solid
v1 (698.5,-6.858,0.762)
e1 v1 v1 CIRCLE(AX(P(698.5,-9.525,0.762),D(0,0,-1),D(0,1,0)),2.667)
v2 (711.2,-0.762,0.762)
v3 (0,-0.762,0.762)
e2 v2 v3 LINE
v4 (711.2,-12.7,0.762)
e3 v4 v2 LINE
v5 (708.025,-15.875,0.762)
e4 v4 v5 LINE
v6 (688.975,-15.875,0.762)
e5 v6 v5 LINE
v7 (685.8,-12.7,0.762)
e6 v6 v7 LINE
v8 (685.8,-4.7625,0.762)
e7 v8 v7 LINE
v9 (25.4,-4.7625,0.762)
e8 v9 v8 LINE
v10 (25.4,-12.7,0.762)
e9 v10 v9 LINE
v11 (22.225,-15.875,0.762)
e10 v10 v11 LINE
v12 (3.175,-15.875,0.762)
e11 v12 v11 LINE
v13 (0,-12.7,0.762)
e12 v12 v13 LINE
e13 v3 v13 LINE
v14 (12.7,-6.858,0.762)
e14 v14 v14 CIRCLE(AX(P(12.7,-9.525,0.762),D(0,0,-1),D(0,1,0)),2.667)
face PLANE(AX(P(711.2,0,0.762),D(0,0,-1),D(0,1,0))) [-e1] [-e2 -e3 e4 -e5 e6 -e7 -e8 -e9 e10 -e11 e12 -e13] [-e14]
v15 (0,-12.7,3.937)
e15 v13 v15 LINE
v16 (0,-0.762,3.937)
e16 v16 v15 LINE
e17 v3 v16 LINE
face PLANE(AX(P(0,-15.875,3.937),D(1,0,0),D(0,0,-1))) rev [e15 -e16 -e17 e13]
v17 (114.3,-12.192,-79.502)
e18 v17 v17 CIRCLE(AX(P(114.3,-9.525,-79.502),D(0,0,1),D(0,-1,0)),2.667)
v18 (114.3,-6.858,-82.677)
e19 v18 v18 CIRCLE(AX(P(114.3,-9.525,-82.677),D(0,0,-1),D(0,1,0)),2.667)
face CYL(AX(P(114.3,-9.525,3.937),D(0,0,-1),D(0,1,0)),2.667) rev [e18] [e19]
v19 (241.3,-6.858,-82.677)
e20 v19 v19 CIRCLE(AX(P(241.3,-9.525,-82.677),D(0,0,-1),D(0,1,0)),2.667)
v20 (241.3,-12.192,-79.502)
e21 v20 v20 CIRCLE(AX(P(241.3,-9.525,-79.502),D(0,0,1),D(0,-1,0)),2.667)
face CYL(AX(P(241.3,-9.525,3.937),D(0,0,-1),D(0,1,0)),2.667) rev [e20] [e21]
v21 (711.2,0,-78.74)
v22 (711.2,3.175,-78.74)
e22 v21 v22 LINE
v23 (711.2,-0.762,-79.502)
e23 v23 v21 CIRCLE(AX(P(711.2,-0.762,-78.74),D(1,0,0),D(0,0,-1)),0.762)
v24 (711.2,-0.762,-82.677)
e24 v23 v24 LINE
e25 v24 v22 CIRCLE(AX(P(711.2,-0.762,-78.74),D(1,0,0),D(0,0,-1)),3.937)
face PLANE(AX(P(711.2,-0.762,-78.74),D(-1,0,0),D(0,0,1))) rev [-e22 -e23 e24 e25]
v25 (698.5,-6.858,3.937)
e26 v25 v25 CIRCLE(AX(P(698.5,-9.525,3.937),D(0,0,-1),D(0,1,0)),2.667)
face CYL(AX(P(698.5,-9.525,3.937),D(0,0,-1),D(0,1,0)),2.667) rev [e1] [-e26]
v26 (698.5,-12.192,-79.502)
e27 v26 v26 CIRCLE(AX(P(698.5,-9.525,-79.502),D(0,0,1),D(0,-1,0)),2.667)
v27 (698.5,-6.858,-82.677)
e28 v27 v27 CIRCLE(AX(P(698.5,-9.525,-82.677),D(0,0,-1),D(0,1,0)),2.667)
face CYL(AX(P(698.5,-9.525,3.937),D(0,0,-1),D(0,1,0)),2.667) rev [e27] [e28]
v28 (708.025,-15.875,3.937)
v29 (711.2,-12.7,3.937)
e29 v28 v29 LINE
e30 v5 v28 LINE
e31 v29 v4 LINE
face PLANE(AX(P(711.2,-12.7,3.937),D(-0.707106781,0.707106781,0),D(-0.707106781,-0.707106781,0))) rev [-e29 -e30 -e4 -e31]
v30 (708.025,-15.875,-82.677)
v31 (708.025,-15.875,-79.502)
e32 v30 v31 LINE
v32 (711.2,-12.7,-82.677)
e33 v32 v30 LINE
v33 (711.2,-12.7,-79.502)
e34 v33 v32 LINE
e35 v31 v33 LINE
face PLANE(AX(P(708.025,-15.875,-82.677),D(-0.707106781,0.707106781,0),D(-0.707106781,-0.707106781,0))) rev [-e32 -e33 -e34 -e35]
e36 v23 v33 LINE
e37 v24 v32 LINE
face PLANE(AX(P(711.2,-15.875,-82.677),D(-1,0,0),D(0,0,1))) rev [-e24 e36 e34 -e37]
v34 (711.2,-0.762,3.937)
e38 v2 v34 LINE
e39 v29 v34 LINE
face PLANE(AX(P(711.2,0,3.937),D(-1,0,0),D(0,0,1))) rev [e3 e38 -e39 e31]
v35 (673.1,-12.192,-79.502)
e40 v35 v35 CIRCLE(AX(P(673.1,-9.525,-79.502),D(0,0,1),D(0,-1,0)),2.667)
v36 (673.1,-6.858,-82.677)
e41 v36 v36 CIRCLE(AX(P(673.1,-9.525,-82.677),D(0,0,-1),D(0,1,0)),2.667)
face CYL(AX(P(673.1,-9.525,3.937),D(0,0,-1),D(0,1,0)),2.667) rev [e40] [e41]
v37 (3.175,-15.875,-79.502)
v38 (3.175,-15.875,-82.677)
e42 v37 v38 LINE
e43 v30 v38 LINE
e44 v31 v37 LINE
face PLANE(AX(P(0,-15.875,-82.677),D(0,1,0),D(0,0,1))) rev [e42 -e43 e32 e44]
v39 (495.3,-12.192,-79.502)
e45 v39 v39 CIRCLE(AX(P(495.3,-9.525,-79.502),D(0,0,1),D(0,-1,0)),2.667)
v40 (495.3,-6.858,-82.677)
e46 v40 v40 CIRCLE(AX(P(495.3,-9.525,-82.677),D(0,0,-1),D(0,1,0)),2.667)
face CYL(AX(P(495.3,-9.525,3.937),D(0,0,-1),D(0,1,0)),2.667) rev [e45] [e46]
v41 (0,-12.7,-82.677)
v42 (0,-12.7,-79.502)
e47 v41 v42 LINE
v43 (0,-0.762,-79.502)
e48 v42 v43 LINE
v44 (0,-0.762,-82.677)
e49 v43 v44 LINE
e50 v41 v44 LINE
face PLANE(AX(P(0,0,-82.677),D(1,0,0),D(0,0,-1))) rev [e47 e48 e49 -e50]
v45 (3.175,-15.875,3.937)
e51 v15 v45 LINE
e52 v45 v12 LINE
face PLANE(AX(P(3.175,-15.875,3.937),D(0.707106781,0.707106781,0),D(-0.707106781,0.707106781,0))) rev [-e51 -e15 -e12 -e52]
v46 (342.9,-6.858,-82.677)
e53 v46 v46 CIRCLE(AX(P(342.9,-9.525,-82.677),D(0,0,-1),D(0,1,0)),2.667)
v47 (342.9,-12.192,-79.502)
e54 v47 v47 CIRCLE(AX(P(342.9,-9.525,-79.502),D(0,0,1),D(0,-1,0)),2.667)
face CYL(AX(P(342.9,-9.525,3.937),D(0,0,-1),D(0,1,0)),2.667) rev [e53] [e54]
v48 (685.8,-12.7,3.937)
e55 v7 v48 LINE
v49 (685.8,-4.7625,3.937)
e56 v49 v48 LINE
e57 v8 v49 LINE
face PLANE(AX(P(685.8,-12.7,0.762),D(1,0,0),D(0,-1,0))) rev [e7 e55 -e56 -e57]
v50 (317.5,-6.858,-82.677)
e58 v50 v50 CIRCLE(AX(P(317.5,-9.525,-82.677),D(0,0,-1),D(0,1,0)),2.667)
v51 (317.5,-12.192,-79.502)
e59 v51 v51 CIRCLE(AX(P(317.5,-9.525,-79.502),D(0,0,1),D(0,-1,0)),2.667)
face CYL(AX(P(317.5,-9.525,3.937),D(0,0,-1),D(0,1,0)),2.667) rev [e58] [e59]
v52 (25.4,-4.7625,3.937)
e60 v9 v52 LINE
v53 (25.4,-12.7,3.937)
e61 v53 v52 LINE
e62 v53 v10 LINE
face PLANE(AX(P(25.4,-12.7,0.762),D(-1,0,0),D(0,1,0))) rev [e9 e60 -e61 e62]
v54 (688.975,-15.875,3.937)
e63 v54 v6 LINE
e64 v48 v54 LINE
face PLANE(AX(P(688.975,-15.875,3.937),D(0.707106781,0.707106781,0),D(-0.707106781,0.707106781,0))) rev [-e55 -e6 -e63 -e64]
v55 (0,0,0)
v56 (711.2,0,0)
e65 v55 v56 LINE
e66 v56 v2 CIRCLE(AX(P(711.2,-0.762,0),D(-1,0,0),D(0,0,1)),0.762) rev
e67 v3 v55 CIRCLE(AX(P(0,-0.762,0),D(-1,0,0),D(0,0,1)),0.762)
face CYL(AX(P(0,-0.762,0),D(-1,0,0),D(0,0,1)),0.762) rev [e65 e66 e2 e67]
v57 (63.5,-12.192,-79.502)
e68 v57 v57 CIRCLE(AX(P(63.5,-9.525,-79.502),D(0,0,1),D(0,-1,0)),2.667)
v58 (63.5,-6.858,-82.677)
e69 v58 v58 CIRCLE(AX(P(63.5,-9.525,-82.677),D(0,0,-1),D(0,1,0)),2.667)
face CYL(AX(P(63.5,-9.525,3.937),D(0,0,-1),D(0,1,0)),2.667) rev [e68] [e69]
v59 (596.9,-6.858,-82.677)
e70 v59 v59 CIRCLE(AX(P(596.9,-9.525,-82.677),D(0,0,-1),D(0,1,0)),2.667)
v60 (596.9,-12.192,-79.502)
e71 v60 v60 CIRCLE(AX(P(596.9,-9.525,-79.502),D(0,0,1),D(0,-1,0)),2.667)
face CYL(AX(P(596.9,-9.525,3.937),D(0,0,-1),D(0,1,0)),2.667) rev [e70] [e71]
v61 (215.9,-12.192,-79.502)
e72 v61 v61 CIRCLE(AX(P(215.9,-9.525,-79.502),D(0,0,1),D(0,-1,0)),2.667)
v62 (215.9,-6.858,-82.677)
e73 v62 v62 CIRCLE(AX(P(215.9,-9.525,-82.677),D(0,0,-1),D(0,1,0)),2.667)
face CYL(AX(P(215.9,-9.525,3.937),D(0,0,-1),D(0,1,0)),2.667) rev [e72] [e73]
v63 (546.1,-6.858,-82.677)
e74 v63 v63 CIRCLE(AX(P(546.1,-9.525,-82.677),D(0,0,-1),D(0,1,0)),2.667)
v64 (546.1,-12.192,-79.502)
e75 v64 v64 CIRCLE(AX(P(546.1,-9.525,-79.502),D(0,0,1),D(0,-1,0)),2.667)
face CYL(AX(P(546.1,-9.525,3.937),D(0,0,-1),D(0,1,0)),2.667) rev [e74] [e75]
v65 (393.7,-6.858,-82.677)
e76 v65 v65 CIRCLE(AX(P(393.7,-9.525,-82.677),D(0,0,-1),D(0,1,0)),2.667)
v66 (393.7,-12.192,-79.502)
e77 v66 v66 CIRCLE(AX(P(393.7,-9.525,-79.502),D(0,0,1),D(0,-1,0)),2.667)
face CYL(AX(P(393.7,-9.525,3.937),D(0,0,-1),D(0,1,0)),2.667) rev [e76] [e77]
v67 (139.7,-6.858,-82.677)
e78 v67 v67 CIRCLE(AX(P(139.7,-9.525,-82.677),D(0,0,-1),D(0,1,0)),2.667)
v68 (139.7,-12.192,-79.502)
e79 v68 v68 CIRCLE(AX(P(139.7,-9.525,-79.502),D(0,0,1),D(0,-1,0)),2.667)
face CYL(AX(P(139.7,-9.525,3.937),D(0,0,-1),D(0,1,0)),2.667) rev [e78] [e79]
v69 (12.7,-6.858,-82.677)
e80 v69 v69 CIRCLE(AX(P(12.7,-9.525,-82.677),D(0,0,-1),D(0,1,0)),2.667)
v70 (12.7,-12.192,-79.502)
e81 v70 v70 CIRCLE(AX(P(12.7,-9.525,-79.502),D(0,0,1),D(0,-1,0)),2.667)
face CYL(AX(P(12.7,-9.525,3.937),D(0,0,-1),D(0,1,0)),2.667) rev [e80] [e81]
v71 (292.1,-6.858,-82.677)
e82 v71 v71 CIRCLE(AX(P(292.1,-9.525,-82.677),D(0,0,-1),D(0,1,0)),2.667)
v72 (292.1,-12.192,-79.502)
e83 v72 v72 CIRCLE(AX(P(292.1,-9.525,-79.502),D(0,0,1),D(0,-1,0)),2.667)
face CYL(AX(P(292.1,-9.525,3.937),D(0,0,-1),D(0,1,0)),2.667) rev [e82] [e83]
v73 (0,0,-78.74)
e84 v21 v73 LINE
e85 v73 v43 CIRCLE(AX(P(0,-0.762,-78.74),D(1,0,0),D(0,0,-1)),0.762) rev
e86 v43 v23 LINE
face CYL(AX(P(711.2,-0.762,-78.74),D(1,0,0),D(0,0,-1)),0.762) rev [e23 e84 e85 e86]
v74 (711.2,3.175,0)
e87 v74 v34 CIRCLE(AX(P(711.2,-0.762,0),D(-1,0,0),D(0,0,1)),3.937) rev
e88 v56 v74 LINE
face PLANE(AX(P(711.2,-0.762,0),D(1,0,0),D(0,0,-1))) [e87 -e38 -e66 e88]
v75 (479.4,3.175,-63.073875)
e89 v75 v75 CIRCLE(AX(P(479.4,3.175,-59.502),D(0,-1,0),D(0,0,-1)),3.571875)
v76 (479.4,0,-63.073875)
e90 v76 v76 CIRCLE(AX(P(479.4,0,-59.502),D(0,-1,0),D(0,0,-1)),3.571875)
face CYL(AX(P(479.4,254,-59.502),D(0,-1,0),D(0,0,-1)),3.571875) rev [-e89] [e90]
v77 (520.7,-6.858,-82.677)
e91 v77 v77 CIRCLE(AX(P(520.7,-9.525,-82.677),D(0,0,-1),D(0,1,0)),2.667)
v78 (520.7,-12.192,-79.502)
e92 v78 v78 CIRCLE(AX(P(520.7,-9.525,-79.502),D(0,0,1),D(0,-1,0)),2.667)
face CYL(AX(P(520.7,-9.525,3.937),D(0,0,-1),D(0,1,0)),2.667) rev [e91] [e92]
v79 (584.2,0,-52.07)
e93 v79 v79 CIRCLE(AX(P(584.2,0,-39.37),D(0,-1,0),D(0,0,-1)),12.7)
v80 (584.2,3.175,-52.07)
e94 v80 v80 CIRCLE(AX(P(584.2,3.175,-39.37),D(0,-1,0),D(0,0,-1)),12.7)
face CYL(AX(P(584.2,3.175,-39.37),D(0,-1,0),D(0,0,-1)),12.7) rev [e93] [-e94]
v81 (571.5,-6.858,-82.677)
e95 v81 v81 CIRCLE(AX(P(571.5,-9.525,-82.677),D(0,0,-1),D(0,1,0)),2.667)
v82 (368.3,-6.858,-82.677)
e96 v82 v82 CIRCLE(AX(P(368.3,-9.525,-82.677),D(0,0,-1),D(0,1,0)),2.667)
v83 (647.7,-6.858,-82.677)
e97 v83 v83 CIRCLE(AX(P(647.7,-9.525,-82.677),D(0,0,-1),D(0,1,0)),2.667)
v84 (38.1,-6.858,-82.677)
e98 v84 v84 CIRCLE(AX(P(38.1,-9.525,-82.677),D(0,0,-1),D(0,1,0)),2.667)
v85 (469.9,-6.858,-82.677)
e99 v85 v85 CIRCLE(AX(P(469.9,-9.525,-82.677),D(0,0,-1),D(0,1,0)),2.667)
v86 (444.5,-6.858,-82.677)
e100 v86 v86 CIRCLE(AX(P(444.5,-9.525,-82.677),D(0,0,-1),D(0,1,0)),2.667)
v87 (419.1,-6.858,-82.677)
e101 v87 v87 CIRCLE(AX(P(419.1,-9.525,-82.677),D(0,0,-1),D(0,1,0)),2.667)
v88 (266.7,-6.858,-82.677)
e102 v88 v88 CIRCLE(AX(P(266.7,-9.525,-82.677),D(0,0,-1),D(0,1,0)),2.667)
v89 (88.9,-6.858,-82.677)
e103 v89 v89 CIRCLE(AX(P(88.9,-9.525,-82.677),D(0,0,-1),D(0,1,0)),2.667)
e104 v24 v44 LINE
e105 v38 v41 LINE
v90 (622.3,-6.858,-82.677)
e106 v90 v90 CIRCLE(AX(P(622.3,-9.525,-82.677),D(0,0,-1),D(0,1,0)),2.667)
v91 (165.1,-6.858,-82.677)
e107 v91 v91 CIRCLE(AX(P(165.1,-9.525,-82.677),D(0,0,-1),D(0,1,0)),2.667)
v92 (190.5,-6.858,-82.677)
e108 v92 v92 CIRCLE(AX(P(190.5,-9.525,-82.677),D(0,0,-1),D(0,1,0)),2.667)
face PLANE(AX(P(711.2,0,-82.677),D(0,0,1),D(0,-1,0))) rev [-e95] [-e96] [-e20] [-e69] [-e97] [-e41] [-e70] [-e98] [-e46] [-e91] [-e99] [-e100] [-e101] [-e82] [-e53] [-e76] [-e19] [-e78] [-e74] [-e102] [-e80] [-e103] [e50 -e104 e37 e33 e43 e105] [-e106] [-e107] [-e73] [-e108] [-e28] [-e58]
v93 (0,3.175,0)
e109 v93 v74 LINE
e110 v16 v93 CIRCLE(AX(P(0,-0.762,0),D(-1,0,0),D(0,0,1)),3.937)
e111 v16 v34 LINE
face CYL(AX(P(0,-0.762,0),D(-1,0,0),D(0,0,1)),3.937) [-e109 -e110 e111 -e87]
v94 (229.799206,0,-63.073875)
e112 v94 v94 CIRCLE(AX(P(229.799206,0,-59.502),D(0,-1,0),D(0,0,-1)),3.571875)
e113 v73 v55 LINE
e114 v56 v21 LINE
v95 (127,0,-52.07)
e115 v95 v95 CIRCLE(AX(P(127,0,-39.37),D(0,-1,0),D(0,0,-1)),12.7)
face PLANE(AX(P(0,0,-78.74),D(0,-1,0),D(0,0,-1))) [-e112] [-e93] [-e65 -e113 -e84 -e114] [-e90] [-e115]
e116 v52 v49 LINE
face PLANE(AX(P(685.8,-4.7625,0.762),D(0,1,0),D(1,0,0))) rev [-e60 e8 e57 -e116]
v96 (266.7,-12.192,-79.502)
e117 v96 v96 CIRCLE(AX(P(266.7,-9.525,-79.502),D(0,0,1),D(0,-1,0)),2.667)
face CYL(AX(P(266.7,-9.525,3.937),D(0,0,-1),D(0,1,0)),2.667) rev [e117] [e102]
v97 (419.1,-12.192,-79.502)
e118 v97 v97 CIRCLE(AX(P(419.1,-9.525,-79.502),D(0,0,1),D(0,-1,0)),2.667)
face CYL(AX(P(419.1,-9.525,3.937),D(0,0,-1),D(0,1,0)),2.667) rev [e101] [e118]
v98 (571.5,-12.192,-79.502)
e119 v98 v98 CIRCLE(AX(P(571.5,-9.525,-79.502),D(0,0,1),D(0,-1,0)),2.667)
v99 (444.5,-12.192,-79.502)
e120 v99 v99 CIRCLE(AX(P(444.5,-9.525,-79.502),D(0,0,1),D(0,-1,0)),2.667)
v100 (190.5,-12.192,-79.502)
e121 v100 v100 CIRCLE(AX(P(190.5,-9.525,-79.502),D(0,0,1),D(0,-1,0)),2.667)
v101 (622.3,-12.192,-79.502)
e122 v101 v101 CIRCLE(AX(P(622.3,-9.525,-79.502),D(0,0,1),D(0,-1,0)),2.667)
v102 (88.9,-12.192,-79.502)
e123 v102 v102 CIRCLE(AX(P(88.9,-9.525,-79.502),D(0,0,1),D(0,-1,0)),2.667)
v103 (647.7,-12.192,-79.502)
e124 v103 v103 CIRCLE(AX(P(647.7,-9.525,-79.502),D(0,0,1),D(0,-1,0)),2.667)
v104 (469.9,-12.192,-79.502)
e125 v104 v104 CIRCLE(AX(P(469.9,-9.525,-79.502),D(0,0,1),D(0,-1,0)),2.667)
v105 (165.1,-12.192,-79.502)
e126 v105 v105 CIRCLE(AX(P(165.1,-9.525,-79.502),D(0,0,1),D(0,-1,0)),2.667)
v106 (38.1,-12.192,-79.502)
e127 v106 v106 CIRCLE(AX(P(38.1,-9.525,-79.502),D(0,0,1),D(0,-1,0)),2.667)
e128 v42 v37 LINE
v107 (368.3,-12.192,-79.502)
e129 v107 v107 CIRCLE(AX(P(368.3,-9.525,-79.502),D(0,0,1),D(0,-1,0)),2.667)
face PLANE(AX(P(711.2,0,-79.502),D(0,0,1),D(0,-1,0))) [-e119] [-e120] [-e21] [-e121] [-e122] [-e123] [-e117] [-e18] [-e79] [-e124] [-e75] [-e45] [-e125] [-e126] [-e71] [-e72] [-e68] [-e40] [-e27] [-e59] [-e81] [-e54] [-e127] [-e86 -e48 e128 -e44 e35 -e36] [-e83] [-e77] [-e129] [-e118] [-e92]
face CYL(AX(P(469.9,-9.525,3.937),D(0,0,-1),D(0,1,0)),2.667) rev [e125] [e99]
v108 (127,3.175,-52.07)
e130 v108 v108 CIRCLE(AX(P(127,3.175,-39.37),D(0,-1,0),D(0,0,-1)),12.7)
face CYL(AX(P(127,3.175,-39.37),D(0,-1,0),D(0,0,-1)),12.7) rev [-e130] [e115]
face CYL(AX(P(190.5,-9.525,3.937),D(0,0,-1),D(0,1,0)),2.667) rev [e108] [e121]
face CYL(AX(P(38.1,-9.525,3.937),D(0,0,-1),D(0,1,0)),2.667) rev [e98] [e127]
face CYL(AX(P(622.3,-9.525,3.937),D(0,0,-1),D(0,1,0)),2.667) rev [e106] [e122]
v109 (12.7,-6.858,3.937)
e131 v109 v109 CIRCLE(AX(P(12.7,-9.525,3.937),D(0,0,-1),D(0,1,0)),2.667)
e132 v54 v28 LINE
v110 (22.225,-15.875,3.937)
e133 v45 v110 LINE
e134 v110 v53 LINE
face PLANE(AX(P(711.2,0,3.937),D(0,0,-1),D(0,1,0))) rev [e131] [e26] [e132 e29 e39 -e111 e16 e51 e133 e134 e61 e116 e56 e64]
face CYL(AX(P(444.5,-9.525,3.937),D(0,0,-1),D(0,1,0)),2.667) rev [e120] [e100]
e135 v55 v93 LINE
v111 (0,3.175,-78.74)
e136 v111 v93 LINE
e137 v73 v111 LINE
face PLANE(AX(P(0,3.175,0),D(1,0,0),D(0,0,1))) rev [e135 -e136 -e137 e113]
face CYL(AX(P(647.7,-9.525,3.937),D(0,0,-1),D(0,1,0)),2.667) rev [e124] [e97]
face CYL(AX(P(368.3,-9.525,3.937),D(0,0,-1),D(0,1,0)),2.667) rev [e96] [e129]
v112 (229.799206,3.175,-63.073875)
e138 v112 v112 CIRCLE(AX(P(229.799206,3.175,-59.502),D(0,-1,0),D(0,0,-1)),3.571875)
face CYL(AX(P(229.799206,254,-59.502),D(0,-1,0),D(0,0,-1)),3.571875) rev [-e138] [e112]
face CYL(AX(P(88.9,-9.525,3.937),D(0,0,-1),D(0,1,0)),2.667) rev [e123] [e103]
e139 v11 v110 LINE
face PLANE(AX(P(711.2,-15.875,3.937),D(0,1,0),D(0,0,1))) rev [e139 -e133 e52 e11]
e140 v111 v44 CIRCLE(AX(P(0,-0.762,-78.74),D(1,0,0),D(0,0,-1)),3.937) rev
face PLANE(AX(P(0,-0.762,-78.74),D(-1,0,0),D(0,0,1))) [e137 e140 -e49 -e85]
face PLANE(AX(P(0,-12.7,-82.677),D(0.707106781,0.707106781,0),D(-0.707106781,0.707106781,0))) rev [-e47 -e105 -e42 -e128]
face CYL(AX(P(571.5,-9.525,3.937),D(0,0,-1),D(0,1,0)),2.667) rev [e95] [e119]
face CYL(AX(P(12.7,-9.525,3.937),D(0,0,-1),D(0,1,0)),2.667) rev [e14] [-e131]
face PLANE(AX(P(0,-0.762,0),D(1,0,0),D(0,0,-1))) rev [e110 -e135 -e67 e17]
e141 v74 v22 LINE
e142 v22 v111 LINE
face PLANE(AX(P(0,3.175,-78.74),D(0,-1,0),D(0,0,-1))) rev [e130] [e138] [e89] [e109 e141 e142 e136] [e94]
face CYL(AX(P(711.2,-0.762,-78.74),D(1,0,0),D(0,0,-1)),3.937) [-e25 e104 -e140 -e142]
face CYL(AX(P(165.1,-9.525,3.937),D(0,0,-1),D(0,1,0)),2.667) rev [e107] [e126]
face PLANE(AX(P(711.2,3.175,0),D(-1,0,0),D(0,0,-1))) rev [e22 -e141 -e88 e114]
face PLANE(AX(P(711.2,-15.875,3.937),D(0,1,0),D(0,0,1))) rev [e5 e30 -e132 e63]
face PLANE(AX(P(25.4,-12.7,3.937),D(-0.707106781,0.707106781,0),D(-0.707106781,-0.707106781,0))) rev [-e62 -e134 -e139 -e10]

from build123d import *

# Parameters (mm, degrees)
SKETCH1_W              = 711.2
SKETCH1_H              = 78.74
BOSS_EXTRUDE1_DEPTH    = 3.175
EDGE_FLANGE1_DEPTH     = 711.2
EDGE_FLANGE2_DEPTH     = 711.2
SKETCH14_R             = 2.667
UPPER_FLANGE_HP_DEPTH  = 717.630616581
CUT_EXTRUDE7_START     = -3.175
CUT_EXTRUDE7_OUTLINE_W = 660.4
CUT_EXTRUDE7_OUTLINE_H = 20.875
CUT_EXTRUDE7_OUTLINE_R = 2.667
CUT_EXTRUDE7_DEPTH     = 3.937
CHAMFER1_SIZE          = 3.175
SKETCH22_W             = 3.175
SKETCH22_H             = 11.938
BOSS_EXTRUDE2_DEPTH    = 660.4
SKETCH23_W             = 660.4
SKETCH23_H             = 7.9375
CUT_EXTRUDE8_DEPTH     = 127
SKETCH24_R             = 12.7
CUT_EXTRUDE9_DEPTH     = 717.165443144
SKETCH25_R             = 3.571875
CUT_EXTRUDE10_DEPTH    = 254


# Read off the part's stored shape, not the designer's step: Cut-Extrude7
# Sheet-metal steps are written as plain solids
with BuildPart() as part:
    # Sketch1 → Boss-Extrude1 (new body)
    with BuildSketch(Plane(origin=(0, 0, 0), x_dir=(1, 0, 0), z_dir=(0, 1, 0))):
        with Locations((355.6, 39.37)):
            Rectangle(SKETCH1_W, SKETCH1_H)
    extrude(amount=BOSS_EXTRUDE1_DEPTH)

    # Edge-Flange1 section (across the edge) → Edge-Flange1 (add)
    with BuildSketch(Plane(origin=(711.2, 0, 0.762), x_dir=(0, 0, -1), z_dir=(-1, 0, 0))):
        with BuildLine():
            Line((-3.175, 0.762), (-3.175, 15.875))
            Line((-3.175, 15.875), (0, 15.875))
            Line((0, 15.875), (0, 0.762))
            ThreePointArc((0, 0.762), (0.223184633, 0.223184633), (0.762, 0))
            Line((0.762, 0), (0.762, -3.175))
            ThreePointArc((0.762, -3.175), (-2.021879398, -2.021879398), (-3.175, 0.762))
        make_face()
    extrude(amount=EDGE_FLANGE1_DEPTH)

    # Edge-Flange2 section (across the edge) → Edge-Flange2 (add)
    with BuildSketch(Plane(origin=(0, 0, -79.502), x_dir=(0, 0, 1), z_dir=(1, 0, 0))):
        with BuildLine():
            Line((-3.175, 0.762), (-3.175, 15.875))
            Line((-3.175, 15.875), (0, 15.875))
            Line((0, 15.875), (0, 0.762))
            ThreePointArc((0, 0.762), (0.223184633, 0.223184633), (0.762, 0))
            Line((0.762, 0), (0.762, -3.175))
            ThreePointArc((0.762, -3.175), (-2.021879398, -2.021879398), (-3.175, 0.762))
        make_face()
    extrude(amount=EDGE_FLANGE2_DEPTH)

    # Sketch14 → upper flange HP (cut, through all)
    with BuildSketch(Plane(origin=(0, 0, -82.677), x_dir=(-1, 0, 0), z_dir=(0, 0, -1))):
        with Locations(Location((-12.7, -9.525, 0), (0, 0, 90))):
            Circle(SKETCH14_R)
        with Locations(Location((-38.1, -9.525, 0), (0, 0, 90))):
            Circle(SKETCH14_R)
        with Locations(Location((-63.5, -9.525, 0), (0, 0, 90))):
            Circle(SKETCH14_R)
        with Locations(Location((-88.9, -9.525, 0), (0, 0, 90))):
            Circle(SKETCH14_R)
        with Locations(Location((-114.3, -9.525, 0), (0, 0, 90))):
            Circle(SKETCH14_R)
        with Locations(Location((-139.7, -9.525, 0), (0, 0, 90))):
            Circle(SKETCH14_R)
        with Locations(Location((-165.1, -9.525, 0), (0, 0, 90))):
            Circle(SKETCH14_R)
        with Locations(Location((-190.5, -9.525, 0), (0, 0, 90))):
            Circle(SKETCH14_R)
        with Locations(Location((-215.9, -9.525, 0), (0, 0, 90))):
            Circle(SKETCH14_R)
        with Locations(Location((-241.3, -9.525, 0), (0, 0, 90))):
            Circle(SKETCH14_R)
        with Locations(Location((-266.7, -9.525, 0), (0, 0, 90))):
            Circle(SKETCH14_R)
        with Locations(Location((-292.1, -9.525, 0), (0, 0, 90))):
            Circle(SKETCH14_R)
        with Locations(Location((-317.5, -9.525, 0), (0, 0, 90))):
            Circle(SKETCH14_R)
        with Locations(Location((-342.9, -9.525, 0), (0, 0, 90))):
            Circle(SKETCH14_R)
        with Locations(Location((-368.3, -9.525, 0), (0, 0, 90))):
            Circle(SKETCH14_R)
        with Locations(Location((-393.7, -9.525, 0), (0, 0, 90))):
            Circle(SKETCH14_R)
        with Locations(Location((-419.1, -9.525, 0), (0, 0, 90))):
            Circle(SKETCH14_R)
        with Locations(Location((-444.5, -9.525, 0), (0, 0, 90))):
            Circle(SKETCH14_R)
        with Locations(Location((-469.9, -9.525, 0), (0, 0, 90))):
            Circle(SKETCH14_R)
        with Locations(Location((-495.3, -9.525, 0), (0, 0, 90))):
            Circle(SKETCH14_R)
        with Locations(Location((-520.7, -9.525, 0), (0, 0, 90))):
            Circle(SKETCH14_R)
        with Locations(Location((-546.1, -9.525, 0), (0, 0, 90))):
            Circle(SKETCH14_R)
        with Locations(Location((-571.5, -9.525, 0), (0, 0, 90))):
            Circle(SKETCH14_R)
        with Locations(Location((-596.9, -9.525, 0), (0, 0, 90))):
            Circle(SKETCH14_R)
        with Locations(Location((-622.3, -9.525, 0), (0, 0, 90))):
            Circle(SKETCH14_R)
        with Locations(Location((-647.7, -9.525, 0), (0, 0, 90))):
            Circle(SKETCH14_R)
        with Locations(Location((-673.1, -9.525, 0), (0, 0, 90))):
            Circle(SKETCH14_R)
        with Locations(Location((-698.5, -9.525, 0), (0, 0, 90))):
            Circle(SKETCH14_R)
        with Locations((-723.9, -9.525)):
            Circle(SKETCH14_R)
        with Locations((-749.3, -9.525)):
            Circle(SKETCH14_R)
        with Locations((-774.7, -9.525)):
            Circle(SKETCH14_R)
        with Locations((-800.1, -9.525)):
            Circle(SKETCH14_R)
    extrude(amount=-UPPER_FLANGE_HP_DEPTH, mode=Mode.SUBTRACT)

    # Cut-Extrude7 outline → Cut-Extrude7 (cut)
    with BuildSketch(Plane(origin=(0, 0, 0.762), x_dir=(-1, 0, 0), z_dir=(0, 0, -1)).offset(CUT_EXTRUDE7_START)):
        with Locations((-355.6, -5.4375)):
            Rectangle(CUT_EXTRUDE7_OUTLINE_W, CUT_EXTRUDE7_OUTLINE_H)
        with Locations((-673.1, -9.525)):
            Circle(CUT_EXTRUDE7_OUTLINE_R, mode=Mode.SUBTRACT)
        with Locations((-647.7, -9.525)):
            Circle(CUT_EXTRUDE7_OUTLINE_R, mode=Mode.SUBTRACT)
        with Locations((-622.3, -9.525)):
            Circle(CUT_EXTRUDE7_OUTLINE_R, mode=Mode.SUBTRACT)
        with Locations((-596.9, -9.525)):
            Circle(CUT_EXTRUDE7_OUTLINE_R, mode=Mode.SUBTRACT)
        with Locations((-571.5, -9.525)):
            Circle(CUT_EXTRUDE7_OUTLINE_R, mode=Mode.SUBTRACT)
        with Locations((-546.1, -9.525)):
            Circle(CUT_EXTRUDE7_OUTLINE_R, mode=Mode.SUBTRACT)
        with Locations((-520.7, -9.525)):
            Circle(CUT_EXTRUDE7_OUTLINE_R, mode=Mode.SUBTRACT)
        with Locations((-495.3, -9.525)):
            Circle(CUT_EXTRUDE7_OUTLINE_R, mode=Mode.SUBTRACT)
        with Locations((-469.9, -9.525)):
            Circle(CUT_EXTRUDE7_OUTLINE_R, mode=Mode.SUBTRACT)
        with Locations((-444.5, -9.525)):
            Circle(CUT_EXTRUDE7_OUTLINE_R, mode=Mode.SUBTRACT)
        with Locations((-419.1, -9.525)):
            Circle(CUT_EXTRUDE7_OUTLINE_R, mode=Mode.SUBTRACT)
        with Locations((-393.7, -9.525)):
            Circle(CUT_EXTRUDE7_OUTLINE_R, mode=Mode.SUBTRACT)
        with Locations((-368.3, -9.525)):
            Circle(CUT_EXTRUDE7_OUTLINE_R, mode=Mode.SUBTRACT)
        with Locations((-342.9, -9.525)):
            Circle(CUT_EXTRUDE7_OUTLINE_R, mode=Mode.SUBTRACT)
        with Locations((-317.5, -9.525)):
            Circle(CUT_EXTRUDE7_OUTLINE_R, mode=Mode.SUBTRACT)
        with Locations((-292.1, -9.525)):
            Circle(CUT_EXTRUDE7_OUTLINE_R, mode=Mode.SUBTRACT)
        with Locations((-266.7, -9.525)):
            Circle(CUT_EXTRUDE7_OUTLINE_R, mode=Mode.SUBTRACT)
        with Locations((-241.3, -9.525)):
            Circle(CUT_EXTRUDE7_OUTLINE_R, mode=Mode.SUBTRACT)
        with Locations((-215.9, -9.525)):
            Circle(CUT_EXTRUDE7_OUTLINE_R, mode=Mode.SUBTRACT)
        with Locations((-190.5, -9.525)):
            Circle(CUT_EXTRUDE7_OUTLINE_R, mode=Mode.SUBTRACT)
        with Locations((-165.1, -9.525)):
            Circle(CUT_EXTRUDE7_OUTLINE_R, mode=Mode.SUBTRACT)
        with Locations((-139.7, -9.525)):
            Circle(CUT_EXTRUDE7_OUTLINE_R, mode=Mode.SUBTRACT)
        with Locations((-114.3, -9.525)):
            Circle(CUT_EXTRUDE7_OUTLINE_R, mode=Mode.SUBTRACT)
        with Locations((-88.9, -9.525)):
            Circle(CUT_EXTRUDE7_OUTLINE_R, mode=Mode.SUBTRACT)
        with Locations((-63.5, -9.525)):
            Circle(CUT_EXTRUDE7_OUTLINE_R, mode=Mode.SUBTRACT)
        with Locations((-38.1, -9.525)):
            Circle(CUT_EXTRUDE7_OUTLINE_R, mode=Mode.SUBTRACT)
    extrude(amount=CUT_EXTRUDE7_DEPTH, mode=Mode.SUBTRACT)

    # Chamfer1
    chamfer1_edges = [part.edges().sort_by_distance(p)[0] for p in [
        (711.2, -15.875, 2.3495),
        (0, -15.875, 2.3495),
        (25.4, -15.875, 2.3495),
        (685.8, -15.875, 2.3495),
        (0, -15.875, -81.0895),
        (711.2, -15.875, -81.0895),
    ]]
    chamfer(chamfer1_edges, length=CHAMFER1_SIZE)

    # Sketch22 → Boss-Extrude2 (add)
    with BuildSketch(Plane.ZY.offset(-685.8)):
        with BuildLine():
            ThreePointArc((0, 0), (0.538815367, -0.223184633), (0.762, -0.762))
            Line((0.762, -0.762), (3.937, -0.762))
            ThreePointArc((3.937, -0.762), (2.783879398, 2.021879398), (0, 3.175))
            Line((0, 3.175), (0, 0))
        make_face()
        with Locations((2.3495, -6.731)):
            Rectangle(SKETCH22_W, SKETCH22_H)
    extrude(amount=BOSS_EXTRUDE2_DEPTH)

    # Sketch23 → Cut-Extrude8 (cut)
    with BuildSketch(Plane(origin=(0, 0, 0.762), x_dir=(-1, 0, 0), z_dir=(0, 0, -1))):
        with Locations((-355.6, -8.73125)):
            Rectangle(SKETCH23_W, SKETCH23_H)
    extrude(amount=-CUT_EXTRUDE8_DEPTH, mode=Mode.SUBTRACT)

    # Sketch24 → Cut-Extrude9 (cut, through all)
    with BuildSketch(Plane(origin=(0, 0, 0), x_dir=(-1, 0, 0), z_dir=(0, -1, 0))):
        with Locations(Location((-584.2, 39.37, 0), (0, 0, 90))):
            Circle(SKETCH24_R)
        with Locations(Location((-127, 39.37, 0), (0, 0, 90))):
            Circle(SKETCH24_R)
    extrude(amount=-CUT_EXTRUDE9_DEPTH, mode=Mode.SUBTRACT)

    # Sketch25 → Cut-Extrude10 (cut)
    with BuildSketch(Plane.XZ):
        with Locations(Location((479.4, -59.502, 0), (0, 0, 270))):
            Circle(SKETCH25_R)
        with Locations(Location((229.79920635, -59.502, 0), (0, 0, 270))):
            Circle(SKETCH25_R)
    extrude(amount=-CUT_EXTRUDE10_DEPTH, mode=Mode.SUBTRACT)


solid = part.part
